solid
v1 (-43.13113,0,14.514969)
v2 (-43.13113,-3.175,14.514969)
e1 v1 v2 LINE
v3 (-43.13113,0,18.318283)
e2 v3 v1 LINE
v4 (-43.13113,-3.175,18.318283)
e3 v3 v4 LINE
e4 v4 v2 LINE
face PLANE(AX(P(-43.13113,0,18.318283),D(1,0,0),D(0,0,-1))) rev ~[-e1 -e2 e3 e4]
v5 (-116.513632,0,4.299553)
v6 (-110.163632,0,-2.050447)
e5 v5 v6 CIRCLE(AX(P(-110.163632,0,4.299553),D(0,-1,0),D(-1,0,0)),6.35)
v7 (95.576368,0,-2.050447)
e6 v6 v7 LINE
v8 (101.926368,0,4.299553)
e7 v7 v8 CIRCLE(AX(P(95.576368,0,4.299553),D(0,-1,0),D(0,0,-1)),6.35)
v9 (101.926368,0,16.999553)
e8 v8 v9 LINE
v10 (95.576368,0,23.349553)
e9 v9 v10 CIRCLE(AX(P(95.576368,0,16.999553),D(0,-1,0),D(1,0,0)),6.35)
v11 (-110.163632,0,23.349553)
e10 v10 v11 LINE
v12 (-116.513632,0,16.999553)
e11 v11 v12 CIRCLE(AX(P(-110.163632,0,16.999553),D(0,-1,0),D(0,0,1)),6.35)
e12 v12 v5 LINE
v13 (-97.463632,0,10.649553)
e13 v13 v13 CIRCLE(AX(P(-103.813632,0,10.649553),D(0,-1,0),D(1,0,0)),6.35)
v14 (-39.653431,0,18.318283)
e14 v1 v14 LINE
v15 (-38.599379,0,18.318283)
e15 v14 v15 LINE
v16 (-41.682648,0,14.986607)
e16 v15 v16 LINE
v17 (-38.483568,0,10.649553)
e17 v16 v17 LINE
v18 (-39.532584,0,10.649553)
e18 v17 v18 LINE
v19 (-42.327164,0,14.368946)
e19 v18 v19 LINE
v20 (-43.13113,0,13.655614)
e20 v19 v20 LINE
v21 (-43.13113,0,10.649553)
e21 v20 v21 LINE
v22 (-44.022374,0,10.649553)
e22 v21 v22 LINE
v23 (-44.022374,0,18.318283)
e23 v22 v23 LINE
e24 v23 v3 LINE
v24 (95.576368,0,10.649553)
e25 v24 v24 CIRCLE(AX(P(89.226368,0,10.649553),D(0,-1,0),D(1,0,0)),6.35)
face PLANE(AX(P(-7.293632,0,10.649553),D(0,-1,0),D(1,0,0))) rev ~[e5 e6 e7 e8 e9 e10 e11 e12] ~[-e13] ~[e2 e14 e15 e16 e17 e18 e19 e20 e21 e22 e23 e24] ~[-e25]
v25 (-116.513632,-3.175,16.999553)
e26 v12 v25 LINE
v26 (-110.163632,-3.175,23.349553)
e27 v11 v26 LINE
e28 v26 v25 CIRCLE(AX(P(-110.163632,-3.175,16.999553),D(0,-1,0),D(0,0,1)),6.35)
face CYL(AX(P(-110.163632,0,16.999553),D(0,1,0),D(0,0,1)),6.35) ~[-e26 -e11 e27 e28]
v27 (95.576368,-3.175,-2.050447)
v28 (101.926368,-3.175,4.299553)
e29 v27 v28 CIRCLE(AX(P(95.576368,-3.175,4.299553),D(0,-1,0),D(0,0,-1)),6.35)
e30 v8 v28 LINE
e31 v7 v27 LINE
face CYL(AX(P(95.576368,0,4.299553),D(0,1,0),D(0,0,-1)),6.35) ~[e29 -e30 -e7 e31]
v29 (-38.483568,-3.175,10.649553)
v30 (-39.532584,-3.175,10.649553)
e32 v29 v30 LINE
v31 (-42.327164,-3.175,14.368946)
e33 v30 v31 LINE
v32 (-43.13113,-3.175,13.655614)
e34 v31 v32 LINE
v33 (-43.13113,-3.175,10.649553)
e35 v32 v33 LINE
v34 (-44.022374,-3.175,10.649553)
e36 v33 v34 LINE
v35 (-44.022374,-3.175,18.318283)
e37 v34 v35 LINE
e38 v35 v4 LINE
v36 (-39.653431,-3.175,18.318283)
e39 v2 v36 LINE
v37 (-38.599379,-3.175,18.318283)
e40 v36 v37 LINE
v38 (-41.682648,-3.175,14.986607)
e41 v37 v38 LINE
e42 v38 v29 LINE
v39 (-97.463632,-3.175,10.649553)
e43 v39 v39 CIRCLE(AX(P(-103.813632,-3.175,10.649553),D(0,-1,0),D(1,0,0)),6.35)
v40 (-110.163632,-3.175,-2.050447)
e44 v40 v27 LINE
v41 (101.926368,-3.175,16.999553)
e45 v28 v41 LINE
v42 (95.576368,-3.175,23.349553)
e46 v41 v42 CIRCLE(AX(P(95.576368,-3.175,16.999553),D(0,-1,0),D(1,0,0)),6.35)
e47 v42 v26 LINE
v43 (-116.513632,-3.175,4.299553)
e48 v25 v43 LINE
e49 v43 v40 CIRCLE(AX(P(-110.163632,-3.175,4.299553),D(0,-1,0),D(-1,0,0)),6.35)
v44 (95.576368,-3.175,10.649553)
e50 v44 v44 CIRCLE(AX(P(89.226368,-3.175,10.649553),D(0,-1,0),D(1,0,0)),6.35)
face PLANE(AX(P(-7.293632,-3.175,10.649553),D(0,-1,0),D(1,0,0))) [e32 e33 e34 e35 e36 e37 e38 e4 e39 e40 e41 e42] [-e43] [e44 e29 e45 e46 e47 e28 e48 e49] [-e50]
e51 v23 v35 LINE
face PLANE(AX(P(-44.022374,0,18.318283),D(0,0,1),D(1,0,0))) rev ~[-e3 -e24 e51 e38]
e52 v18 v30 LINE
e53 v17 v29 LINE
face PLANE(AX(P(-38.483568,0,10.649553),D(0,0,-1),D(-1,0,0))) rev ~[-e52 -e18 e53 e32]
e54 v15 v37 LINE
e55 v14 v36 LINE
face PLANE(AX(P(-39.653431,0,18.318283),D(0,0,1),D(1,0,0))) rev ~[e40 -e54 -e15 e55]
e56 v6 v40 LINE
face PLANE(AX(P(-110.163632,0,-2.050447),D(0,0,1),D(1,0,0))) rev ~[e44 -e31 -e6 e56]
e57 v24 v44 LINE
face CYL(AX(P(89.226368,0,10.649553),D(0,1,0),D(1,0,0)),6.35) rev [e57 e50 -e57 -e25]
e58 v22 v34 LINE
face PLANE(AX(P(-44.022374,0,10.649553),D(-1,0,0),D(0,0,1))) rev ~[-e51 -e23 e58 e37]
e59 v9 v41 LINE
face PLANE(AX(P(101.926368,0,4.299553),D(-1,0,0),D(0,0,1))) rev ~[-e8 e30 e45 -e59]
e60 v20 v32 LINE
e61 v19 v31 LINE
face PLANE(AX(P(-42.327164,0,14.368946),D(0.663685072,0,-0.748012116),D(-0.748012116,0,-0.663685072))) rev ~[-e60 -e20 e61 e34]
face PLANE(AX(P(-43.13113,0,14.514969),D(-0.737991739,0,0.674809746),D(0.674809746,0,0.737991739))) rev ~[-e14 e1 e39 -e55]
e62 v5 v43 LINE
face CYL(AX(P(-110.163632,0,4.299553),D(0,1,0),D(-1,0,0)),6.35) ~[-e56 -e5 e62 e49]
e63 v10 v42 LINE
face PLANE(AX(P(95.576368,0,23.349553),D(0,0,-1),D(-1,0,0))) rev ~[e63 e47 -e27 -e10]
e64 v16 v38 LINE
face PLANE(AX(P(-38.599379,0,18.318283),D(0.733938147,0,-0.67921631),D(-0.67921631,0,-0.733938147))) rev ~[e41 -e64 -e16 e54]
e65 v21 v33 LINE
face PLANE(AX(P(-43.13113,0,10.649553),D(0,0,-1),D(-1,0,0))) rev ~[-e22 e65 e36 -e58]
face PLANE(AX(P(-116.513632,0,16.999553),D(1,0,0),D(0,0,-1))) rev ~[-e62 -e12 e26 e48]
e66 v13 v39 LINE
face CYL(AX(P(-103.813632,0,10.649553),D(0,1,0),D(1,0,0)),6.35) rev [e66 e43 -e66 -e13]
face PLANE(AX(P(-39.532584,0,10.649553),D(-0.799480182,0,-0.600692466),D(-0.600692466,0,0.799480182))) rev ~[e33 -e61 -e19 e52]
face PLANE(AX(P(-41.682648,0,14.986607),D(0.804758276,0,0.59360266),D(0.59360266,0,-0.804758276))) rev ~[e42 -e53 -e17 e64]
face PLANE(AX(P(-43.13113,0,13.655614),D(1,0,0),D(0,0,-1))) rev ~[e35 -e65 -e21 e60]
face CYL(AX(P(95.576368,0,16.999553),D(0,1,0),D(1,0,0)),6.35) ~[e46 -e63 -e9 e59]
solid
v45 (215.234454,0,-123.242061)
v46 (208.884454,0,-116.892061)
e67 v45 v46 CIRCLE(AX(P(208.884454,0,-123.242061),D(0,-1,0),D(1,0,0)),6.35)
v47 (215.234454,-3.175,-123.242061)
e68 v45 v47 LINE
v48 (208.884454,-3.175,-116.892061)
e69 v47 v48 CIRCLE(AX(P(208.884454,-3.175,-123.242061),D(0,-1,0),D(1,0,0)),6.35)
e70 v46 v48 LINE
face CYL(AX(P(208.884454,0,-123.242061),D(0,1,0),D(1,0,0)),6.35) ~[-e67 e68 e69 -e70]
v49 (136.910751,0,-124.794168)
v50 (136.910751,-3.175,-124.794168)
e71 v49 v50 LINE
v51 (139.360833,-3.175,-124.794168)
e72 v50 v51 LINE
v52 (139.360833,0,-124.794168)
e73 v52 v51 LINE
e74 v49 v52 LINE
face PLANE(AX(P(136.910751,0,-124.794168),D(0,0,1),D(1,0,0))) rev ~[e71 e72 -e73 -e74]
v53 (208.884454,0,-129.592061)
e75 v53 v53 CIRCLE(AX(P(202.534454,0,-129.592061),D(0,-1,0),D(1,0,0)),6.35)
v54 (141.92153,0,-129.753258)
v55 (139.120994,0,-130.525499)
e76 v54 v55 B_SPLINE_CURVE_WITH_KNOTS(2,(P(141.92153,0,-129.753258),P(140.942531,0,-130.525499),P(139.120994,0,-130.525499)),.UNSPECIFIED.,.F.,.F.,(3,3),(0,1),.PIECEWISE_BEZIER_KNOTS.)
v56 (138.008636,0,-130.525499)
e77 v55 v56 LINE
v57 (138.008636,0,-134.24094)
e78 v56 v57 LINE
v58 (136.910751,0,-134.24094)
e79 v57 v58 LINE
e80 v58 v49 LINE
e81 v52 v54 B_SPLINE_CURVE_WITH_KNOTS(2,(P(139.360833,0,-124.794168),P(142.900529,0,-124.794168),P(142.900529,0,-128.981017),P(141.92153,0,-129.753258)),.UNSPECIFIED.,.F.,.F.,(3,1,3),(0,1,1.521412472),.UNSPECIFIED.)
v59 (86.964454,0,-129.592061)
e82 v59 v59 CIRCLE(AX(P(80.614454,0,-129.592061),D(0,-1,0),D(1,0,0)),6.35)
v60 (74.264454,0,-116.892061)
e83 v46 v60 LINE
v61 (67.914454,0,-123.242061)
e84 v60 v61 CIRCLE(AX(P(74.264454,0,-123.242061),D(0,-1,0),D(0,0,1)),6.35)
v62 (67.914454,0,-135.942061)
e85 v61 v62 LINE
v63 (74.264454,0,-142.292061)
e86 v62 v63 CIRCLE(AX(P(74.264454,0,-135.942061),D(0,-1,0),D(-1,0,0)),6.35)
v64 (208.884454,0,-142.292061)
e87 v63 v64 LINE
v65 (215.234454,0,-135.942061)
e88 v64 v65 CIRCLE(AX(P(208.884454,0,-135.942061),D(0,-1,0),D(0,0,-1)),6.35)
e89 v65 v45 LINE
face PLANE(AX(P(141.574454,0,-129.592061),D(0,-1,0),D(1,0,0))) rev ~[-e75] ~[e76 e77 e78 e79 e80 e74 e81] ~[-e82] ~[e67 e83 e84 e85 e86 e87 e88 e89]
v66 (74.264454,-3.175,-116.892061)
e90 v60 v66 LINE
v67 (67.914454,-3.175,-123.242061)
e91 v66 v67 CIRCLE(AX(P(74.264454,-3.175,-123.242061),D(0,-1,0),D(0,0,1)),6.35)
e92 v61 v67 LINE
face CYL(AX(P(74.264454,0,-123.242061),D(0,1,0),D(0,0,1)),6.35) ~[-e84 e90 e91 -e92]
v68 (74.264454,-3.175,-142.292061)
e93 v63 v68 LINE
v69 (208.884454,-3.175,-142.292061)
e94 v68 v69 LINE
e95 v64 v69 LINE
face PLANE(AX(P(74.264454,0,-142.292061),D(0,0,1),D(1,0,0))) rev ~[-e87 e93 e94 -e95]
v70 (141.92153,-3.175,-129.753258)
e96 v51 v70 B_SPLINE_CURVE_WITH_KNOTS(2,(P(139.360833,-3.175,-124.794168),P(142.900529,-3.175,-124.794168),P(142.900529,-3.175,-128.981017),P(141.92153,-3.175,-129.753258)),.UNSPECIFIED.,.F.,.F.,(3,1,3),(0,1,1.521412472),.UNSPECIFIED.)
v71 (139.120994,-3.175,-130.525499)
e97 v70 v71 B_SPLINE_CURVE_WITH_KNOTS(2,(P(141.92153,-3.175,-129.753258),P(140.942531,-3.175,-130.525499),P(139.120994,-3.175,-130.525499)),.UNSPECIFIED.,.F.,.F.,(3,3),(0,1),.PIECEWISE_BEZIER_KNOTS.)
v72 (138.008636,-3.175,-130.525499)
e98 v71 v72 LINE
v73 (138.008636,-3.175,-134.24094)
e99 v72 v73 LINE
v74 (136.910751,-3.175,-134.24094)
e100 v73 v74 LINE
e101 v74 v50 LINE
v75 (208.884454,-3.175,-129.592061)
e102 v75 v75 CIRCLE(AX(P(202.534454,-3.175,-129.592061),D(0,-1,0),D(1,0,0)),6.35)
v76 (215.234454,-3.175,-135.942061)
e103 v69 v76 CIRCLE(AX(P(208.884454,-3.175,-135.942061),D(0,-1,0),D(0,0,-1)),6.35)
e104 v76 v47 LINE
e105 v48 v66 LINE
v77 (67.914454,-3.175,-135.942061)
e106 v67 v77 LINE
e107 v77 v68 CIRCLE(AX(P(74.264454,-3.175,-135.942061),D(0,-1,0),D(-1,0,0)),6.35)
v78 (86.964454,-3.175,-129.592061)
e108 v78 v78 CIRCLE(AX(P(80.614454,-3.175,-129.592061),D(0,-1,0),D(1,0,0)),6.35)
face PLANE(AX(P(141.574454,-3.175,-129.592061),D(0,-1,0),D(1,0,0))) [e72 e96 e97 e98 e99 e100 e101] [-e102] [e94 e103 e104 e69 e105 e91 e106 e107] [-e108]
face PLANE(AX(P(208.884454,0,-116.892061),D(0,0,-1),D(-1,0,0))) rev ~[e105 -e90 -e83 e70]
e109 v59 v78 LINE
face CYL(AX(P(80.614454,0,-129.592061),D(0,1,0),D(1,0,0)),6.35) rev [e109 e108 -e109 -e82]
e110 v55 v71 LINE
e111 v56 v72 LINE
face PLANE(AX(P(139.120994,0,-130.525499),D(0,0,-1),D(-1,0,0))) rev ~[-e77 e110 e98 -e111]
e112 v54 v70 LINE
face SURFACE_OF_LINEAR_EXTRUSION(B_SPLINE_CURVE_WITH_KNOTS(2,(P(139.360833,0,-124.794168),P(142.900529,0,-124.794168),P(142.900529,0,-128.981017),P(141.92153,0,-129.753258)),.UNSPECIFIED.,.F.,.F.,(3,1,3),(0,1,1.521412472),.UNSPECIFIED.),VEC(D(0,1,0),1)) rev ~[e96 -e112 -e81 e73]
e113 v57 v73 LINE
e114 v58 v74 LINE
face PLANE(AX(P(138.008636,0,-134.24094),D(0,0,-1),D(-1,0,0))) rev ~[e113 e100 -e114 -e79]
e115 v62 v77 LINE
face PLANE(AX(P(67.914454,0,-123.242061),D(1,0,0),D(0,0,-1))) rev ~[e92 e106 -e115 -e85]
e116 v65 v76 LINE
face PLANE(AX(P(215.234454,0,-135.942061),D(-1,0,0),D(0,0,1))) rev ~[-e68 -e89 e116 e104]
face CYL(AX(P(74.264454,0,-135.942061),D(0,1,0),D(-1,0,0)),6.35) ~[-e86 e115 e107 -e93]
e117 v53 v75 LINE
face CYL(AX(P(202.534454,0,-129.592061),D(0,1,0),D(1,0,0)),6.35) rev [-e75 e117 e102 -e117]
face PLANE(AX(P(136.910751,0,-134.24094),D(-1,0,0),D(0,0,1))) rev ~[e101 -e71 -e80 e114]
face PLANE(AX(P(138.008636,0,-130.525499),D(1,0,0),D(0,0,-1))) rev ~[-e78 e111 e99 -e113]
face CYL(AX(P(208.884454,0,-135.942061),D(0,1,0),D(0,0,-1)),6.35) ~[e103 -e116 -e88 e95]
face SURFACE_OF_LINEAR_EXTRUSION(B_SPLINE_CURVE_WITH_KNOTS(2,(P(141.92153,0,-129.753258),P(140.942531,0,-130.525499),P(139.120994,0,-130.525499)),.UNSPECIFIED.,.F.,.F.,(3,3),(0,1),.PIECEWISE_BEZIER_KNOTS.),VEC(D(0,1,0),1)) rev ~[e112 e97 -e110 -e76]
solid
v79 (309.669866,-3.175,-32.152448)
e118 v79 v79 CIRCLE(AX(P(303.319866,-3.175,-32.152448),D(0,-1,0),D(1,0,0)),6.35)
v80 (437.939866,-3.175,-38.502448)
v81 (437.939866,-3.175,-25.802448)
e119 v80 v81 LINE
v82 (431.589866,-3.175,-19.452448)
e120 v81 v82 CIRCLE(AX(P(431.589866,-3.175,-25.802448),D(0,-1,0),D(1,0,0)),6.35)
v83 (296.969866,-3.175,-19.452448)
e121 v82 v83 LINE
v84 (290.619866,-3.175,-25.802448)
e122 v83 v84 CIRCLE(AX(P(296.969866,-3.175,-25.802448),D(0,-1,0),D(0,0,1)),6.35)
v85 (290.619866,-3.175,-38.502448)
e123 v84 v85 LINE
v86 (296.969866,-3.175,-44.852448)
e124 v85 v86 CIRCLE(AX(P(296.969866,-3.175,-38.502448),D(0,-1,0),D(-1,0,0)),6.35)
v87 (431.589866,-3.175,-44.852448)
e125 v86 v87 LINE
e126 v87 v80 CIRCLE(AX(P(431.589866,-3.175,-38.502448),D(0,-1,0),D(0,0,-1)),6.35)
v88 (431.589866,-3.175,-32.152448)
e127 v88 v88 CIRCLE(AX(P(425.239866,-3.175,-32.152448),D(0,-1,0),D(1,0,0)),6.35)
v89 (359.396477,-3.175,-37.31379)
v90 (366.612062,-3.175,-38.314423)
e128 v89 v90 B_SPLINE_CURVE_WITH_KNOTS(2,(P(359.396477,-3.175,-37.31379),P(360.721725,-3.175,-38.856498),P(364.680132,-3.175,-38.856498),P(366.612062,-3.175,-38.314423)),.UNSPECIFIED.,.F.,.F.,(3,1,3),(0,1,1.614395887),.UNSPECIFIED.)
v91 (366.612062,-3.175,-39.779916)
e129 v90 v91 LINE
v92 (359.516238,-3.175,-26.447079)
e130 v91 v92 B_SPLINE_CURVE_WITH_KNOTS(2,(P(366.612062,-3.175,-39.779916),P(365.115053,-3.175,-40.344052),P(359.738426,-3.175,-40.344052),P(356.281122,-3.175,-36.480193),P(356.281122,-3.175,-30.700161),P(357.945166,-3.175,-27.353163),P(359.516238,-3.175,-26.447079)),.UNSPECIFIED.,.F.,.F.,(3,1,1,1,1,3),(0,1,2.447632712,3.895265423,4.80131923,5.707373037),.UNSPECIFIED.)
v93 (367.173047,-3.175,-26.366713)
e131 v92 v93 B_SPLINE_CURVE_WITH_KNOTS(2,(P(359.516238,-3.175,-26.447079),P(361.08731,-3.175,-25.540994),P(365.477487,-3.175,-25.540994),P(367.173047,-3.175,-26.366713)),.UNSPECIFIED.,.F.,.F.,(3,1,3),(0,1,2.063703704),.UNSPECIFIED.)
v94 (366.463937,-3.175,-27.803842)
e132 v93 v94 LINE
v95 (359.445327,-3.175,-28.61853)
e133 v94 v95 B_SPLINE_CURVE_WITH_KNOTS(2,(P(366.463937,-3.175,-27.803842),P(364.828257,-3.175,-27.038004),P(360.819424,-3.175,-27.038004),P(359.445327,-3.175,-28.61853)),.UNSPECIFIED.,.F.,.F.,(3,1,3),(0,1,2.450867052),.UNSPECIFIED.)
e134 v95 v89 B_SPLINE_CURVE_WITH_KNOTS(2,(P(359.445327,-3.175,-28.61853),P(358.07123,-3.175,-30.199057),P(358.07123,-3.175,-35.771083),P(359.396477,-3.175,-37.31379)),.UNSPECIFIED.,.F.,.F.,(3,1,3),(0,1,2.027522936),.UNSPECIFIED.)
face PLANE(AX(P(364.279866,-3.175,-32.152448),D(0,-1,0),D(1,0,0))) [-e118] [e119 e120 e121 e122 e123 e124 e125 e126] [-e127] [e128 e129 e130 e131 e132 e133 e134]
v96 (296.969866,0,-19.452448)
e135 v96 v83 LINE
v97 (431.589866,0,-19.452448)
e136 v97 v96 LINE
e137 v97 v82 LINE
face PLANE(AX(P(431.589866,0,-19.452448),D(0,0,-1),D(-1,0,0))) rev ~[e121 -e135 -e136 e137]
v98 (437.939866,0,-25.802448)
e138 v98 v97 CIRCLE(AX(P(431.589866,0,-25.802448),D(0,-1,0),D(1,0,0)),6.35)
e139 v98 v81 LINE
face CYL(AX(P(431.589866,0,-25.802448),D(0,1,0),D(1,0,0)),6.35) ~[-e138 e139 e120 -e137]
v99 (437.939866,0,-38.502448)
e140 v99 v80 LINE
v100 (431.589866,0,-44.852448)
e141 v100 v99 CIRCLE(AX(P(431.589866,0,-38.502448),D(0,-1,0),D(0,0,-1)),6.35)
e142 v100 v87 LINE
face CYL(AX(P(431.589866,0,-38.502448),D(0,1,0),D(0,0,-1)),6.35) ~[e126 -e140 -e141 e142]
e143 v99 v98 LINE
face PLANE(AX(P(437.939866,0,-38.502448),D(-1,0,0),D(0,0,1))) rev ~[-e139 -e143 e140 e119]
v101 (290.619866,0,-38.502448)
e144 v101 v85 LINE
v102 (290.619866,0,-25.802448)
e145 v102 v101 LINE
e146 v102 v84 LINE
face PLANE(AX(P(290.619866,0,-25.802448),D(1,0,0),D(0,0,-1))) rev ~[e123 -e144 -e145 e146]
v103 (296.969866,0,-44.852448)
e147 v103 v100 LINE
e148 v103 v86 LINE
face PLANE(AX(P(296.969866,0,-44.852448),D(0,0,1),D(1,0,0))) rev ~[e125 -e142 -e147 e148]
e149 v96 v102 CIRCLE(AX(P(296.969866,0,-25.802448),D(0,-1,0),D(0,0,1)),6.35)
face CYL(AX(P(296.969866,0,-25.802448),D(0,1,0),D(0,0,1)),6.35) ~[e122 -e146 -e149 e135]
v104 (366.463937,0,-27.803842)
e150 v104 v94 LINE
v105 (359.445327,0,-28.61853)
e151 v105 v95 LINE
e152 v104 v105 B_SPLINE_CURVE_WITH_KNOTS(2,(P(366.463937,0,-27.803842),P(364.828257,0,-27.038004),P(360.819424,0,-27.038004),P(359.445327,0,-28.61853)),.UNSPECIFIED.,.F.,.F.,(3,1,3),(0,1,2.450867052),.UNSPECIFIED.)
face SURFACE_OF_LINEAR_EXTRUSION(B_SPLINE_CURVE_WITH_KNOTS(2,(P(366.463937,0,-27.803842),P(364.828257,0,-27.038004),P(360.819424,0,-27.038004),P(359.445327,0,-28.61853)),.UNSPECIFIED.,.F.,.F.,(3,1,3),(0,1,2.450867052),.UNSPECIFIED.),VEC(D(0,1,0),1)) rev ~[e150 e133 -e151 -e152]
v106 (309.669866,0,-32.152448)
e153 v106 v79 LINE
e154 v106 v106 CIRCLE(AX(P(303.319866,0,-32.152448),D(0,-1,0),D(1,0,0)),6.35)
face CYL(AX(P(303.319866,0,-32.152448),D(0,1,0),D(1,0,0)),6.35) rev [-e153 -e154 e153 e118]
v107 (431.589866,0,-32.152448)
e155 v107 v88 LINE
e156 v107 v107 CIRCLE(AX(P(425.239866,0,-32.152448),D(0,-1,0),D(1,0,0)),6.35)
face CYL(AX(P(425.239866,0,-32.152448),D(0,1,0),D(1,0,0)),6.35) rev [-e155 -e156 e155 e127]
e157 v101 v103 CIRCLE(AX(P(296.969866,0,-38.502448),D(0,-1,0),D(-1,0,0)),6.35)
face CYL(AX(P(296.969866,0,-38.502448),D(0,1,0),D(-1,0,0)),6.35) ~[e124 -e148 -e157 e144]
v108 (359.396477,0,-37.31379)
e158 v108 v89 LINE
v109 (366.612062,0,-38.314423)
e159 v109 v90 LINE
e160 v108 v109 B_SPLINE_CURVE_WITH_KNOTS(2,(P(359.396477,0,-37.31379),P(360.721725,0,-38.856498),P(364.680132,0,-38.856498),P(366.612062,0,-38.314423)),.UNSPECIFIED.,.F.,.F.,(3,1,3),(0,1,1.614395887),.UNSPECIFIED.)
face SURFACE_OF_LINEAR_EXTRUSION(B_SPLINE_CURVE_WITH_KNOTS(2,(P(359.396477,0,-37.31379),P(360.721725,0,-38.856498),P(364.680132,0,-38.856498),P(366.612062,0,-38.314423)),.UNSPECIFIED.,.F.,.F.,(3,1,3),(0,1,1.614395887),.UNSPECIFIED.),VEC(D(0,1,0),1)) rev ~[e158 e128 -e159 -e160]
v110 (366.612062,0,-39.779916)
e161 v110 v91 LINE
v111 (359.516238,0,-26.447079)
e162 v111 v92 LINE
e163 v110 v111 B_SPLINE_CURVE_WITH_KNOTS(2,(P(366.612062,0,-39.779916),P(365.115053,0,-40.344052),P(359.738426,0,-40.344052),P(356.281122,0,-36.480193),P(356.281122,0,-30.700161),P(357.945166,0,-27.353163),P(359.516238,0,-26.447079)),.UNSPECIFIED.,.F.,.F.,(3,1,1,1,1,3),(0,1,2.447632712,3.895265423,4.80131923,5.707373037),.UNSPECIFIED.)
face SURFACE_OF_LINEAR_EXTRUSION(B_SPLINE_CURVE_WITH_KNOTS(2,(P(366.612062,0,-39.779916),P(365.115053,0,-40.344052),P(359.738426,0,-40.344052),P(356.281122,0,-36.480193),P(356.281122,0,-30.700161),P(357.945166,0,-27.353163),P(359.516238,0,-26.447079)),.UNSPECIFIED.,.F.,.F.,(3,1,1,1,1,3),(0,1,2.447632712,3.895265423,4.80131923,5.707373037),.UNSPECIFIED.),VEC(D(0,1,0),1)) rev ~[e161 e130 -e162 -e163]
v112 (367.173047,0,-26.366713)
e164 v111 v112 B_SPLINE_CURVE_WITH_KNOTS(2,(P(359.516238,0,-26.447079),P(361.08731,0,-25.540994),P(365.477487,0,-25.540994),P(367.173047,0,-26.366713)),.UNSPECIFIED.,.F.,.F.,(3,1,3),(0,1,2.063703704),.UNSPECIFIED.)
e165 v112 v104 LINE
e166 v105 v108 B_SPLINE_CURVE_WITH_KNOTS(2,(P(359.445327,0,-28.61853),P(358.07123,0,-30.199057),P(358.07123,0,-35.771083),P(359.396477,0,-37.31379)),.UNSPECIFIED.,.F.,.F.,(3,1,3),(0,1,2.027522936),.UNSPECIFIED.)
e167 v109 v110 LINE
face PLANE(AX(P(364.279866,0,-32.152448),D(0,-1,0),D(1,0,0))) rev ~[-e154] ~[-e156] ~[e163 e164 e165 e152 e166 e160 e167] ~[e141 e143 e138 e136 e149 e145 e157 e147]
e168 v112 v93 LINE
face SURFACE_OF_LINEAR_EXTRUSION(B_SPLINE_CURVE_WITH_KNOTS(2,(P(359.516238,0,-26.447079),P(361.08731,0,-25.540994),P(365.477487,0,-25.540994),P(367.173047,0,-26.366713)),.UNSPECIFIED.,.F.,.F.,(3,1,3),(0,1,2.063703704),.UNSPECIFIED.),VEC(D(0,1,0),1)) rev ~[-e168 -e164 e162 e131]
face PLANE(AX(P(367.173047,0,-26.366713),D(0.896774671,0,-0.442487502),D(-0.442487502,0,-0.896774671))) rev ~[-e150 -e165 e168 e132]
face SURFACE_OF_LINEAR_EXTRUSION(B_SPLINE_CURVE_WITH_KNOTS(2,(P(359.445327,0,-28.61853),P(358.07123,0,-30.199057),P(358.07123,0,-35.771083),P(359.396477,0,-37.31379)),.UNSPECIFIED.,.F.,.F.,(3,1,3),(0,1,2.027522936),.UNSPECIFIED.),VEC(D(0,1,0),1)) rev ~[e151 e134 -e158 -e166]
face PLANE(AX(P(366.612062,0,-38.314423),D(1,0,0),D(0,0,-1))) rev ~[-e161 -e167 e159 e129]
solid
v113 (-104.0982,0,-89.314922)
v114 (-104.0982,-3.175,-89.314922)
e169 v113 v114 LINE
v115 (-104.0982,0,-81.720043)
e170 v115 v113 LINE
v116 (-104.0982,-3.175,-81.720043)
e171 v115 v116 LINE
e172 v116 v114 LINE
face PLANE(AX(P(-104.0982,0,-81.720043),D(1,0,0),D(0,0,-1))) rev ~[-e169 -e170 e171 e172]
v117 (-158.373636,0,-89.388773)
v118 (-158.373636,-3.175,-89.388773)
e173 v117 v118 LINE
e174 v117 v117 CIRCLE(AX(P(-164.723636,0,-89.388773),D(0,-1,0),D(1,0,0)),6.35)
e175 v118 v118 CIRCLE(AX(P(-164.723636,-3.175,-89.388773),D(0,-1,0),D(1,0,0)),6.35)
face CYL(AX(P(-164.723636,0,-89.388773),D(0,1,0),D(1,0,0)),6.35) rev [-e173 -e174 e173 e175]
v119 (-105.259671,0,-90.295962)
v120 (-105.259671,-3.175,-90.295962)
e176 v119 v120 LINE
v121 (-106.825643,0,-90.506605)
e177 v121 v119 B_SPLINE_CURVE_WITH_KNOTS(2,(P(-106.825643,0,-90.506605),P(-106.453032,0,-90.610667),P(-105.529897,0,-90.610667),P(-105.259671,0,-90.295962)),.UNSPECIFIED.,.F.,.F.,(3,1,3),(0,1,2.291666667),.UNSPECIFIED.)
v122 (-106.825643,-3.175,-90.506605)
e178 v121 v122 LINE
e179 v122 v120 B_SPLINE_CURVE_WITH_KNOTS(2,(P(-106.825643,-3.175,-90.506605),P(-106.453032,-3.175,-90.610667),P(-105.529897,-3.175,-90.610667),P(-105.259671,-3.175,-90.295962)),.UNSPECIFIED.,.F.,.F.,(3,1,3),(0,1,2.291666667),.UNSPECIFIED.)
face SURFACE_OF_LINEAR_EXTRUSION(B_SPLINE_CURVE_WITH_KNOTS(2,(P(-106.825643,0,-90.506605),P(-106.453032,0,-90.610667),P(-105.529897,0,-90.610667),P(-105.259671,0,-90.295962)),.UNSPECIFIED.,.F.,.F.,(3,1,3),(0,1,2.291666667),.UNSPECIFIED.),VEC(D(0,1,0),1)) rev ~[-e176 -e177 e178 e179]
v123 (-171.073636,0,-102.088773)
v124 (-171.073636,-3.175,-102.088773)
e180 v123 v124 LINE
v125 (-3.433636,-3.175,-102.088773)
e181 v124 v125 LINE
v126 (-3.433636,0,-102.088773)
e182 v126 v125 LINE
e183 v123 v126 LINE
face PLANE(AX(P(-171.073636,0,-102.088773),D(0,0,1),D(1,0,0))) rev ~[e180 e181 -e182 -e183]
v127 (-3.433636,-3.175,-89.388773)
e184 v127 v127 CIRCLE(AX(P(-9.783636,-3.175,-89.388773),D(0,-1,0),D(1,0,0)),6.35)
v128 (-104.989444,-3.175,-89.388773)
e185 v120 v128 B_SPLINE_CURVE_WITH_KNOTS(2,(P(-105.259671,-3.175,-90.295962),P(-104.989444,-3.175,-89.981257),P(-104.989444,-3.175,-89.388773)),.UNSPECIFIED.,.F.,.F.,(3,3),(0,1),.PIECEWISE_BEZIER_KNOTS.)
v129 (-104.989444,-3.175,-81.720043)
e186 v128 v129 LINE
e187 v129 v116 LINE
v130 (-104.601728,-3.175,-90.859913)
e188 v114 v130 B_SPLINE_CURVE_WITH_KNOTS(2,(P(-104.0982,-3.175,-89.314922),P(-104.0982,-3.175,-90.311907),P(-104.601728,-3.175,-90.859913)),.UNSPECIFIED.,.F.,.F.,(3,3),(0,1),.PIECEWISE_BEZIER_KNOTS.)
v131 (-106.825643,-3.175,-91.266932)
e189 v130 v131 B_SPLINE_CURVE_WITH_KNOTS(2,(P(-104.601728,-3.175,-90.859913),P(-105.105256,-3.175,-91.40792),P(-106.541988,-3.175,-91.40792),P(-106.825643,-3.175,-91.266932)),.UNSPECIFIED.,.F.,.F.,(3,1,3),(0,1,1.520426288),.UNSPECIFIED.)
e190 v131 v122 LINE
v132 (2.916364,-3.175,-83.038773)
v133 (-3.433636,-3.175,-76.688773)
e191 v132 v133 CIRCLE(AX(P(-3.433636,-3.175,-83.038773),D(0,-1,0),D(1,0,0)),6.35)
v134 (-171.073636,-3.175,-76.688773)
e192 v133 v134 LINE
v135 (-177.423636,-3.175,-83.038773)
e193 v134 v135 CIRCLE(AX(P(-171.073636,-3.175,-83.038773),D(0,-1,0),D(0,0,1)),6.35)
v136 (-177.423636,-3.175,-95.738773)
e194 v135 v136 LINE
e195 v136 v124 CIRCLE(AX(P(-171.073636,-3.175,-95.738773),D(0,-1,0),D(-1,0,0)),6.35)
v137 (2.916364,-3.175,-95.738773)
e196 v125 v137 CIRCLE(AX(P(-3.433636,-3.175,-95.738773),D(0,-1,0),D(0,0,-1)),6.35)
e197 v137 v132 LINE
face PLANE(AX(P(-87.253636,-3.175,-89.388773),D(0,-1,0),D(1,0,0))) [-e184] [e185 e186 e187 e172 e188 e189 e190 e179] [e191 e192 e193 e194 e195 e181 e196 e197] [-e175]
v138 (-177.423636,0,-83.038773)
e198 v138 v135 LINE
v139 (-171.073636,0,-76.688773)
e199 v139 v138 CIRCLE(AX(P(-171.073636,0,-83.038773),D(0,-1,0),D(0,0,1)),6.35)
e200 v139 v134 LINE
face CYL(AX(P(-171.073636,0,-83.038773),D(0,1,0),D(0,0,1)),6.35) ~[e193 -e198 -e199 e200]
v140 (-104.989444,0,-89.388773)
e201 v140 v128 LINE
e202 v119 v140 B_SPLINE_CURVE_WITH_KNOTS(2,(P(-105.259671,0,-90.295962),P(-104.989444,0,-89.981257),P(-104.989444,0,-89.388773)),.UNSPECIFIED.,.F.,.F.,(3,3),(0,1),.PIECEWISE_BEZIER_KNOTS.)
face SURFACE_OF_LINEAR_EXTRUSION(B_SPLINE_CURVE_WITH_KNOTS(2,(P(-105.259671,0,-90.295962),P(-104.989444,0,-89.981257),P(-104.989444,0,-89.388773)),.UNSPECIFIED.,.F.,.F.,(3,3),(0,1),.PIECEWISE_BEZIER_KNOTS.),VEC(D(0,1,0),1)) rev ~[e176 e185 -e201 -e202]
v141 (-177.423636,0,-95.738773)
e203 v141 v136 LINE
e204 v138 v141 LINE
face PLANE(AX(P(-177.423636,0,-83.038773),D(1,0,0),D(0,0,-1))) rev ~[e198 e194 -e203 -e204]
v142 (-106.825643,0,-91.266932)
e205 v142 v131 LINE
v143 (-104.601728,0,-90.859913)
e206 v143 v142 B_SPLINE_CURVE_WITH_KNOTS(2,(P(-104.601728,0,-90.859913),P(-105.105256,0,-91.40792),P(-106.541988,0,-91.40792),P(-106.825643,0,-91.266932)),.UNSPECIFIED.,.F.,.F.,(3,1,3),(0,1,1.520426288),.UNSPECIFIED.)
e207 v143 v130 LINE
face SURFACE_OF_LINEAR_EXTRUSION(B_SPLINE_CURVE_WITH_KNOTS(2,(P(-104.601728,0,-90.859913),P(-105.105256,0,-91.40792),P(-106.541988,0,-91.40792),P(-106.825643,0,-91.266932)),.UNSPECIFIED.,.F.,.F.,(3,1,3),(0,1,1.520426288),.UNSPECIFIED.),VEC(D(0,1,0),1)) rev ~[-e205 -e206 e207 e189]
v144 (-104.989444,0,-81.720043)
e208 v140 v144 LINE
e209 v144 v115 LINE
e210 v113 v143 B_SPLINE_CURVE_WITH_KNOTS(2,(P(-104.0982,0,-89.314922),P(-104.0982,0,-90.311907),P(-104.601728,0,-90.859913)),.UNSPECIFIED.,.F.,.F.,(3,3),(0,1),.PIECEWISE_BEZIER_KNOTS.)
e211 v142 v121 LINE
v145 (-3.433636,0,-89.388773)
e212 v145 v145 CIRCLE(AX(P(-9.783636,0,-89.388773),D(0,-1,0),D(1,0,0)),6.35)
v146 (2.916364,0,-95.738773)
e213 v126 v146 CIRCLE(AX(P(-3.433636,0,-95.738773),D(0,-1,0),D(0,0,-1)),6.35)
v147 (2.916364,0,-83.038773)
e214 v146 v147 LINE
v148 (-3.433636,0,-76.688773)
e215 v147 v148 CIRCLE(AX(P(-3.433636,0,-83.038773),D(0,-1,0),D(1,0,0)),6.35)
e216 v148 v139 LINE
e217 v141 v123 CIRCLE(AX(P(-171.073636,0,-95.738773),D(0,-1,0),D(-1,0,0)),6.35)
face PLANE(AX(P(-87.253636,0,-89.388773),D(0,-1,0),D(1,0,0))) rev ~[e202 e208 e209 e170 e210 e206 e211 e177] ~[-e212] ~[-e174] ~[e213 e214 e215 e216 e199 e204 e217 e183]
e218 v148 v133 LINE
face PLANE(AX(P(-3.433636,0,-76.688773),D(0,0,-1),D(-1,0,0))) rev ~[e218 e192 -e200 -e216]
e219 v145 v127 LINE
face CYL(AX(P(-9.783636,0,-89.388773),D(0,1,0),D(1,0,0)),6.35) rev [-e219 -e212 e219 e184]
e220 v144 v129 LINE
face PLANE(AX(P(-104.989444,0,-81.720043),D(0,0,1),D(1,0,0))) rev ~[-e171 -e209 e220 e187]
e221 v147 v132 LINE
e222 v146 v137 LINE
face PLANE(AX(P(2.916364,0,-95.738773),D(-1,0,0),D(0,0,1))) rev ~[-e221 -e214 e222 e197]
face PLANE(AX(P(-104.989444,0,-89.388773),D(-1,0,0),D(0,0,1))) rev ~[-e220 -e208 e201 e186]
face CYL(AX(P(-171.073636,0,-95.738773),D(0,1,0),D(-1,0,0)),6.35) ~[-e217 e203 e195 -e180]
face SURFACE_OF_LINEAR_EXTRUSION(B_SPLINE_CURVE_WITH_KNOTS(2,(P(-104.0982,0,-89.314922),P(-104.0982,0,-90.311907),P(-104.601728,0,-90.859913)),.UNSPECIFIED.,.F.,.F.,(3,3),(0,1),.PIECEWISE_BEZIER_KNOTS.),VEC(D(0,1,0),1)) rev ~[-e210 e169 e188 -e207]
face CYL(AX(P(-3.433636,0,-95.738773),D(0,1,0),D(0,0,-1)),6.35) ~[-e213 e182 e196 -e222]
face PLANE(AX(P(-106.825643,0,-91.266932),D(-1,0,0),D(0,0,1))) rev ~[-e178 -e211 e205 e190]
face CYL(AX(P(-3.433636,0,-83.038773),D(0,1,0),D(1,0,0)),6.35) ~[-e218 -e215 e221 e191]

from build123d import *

# Parameters (mm, degrees)
F1_R     = 6.35
F2_DEPTH = 3.175
F3_R     = 6.35
F4_DEPTH = 3.175
F5_R     = 6.35
F6_DEPTH = 3.175
F7_R     = 6.35
F8_DEPTH = 3.175


# Not quite as in the source:
# - a length typed as a fraction of an inch, garbled in the dataset ("3 / 203.2 mm" for 3/8 in), is restored


with BuildPart() as f2:
    # F1 (on Front) → F2 (new body)
    with BuildSketch(Plane.XZ):
        with BuildLine():
            Line((95.5763677621, 23.3495529922), (-110.1636322379, 23.3495529922))
            ThreePointArc((-110.1636322379, 23.3495529922), (-114.6537602984, 21.4896810527), (-116.5136322379, 16.9995529922))
            Line((-116.5136322379, 16.9995529922), (-116.5136322379, 4.2995529922))
            ThreePointArc((-116.5136322379, 4.2995529922), (-114.6537602984, -0.1905750684), (-110.1636322379, -2.0504470078))
            Line((-110.1636322379, -2.0504470078), (95.5763677621, -2.0504470078))
            ThreePointArc((95.5763677621, -2.0504470078), (100.0664958226, -0.1905750684), (101.9263677621, 4.2995529922))
            Line((101.9263677621, 4.2995529922), (101.9263677621, 16.9995529922))
            ThreePointArc((101.9263677621, 16.9995529922), (100.0664958226, 21.4896810527), (95.5763677621, 23.3495529922))
        make_face()
        with Locations((-103.8136322379, 10.6495529922)):
            Circle(F1_R, mode=Mode.SUBTRACT)
        Polygon((-41.6826481417, 14.9866065492), (-38.4835676154, 10.6495529922), (-39.5325840524, 10.6495529922), (-42.3271638406, 14.3689456712), (-43.1311300379, 13.655614494), (-43.1311300379, 10.6495529922), (-44.0223744027, 10.6495529922), (-44.0223744027, 18.3182827531), (-43.1311300379, 18.3182827531), (-43.1311300379, 14.5149687592), (-39.653430746, 18.3182827531), (-38.5993790301, 18.3182827531), align=None, mode=Mode.SUBTRACT)
        with Locations((89.2263677621, 10.6495529922)):
            Circle(F1_R, mode=Mode.SUBTRACT)
    extrude(amount=F2_DEPTH)


with BuildPart() as f4:
    # F3 (on Front) → F4 (new body)
    with BuildSketch(Plane.XZ):
        with BuildLine():
            Line((-3.4336355138, -76.6887728453), (-171.0736355138, -76.6887728453))
            ThreePointArc((-171.0736355138, -76.6887728453), (-175.5637635743, -78.5486447847), (-177.4236355138, -83.0387728453))
            Line((-177.4236355138, -83.0387728453), (-177.4236355138, -95.7387728453))
            ThreePointArc((-177.4236355138, -95.7387728453), (-175.5637635743, -100.2289009058), (-171.0736355138, -102.0887728453))
            Line((-171.0736355138, -102.0887728453), (-3.4336355138, -102.0887728453))
            ThreePointArc((-3.4336355138, -102.0887728453), (1.0564925468, -100.2289009058), (2.9163644862, -95.7387728453))
            Line((2.9163644862, -95.7387728453), (2.9163644862, -83.0387728453))
            ThreePointArc((2.9163644862, -83.0387728453), (1.0564925468, -78.5486447847), (-3.4336355138, -76.6887728453))
        make_face()
        with Locations((-9.7836355138, -89.3887728453)):
            Circle(F3_R, mode=Mode.SUBTRACT)
        with Locations((-164.7236355138, -89.3887728453)):
            Circle(F3_R, mode=Mode.SUBTRACT)
        with BuildLine():
            add(Edge.make_bspline(
                [(-104.6017276977, -90.8599134965), (-105.1052555874, -91.4079196832), (-106.0502095939, -91.4079196832)],
                knots=[0, 0, 0, 1, 1, 1], degree=2))
            add(Edge.make_bspline(
                [(-106.0502095939, -91.4079196832), (-106.5419884995, -91.4079196832), (-106.8256425441, -91.266931874)],
                knots=[0, 0, 0, 1, 1, 1], degree=2))
            Line((-106.8256425441, -91.266931874), (-106.8256425441, -90.5066047605))
            add(Edge.make_bspline(
                [(-106.8256425441, -90.5066047605), (-106.4530319057, -90.6106671911), (-106.0502095939, -90.6106671911)],
                knots=[0, 0, 0, 1, 1, 1], degree=2))
            add(Edge.make_bspline(
                [(-106.0502095939, -90.6106671911), (-105.5298974411, -90.6106671911), (-105.2596708069, -90.29596226)],
                knots=[0, 0, 0, 1, 1, 1], degree=2))
            add(Edge.make_bspline(
                [(-105.2596708069, -90.29596226), (-104.9894441728, -89.9812573289), (-104.9894441728, -89.3887728453)],
                knots=[0, 0, 0, 1, 1, 1], degree=2))
            Line((-104.9894441728, -89.3887728453), (-104.9894441728, -81.7200430843))
            Line((-104.9894441728, -81.7200430843), (-104.0981998079, -81.7200430843))
            Line((-104.0981998079, -81.7200430843), (-104.0981998079, -89.3149220881))
            add(Edge.make_bspline(
                [(-104.0981998079, -89.3149220881), (-104.0981998079, -90.3119073098), (-104.6017276977, -90.8599134965)],
                knots=[0, 0, 0, 1, 1, 1], degree=2))
        make_face(mode=Mode.SUBTRACT)
    extrude(amount=F4_DEPTH)


with BuildPart() as f6:
    # F5 (on Front) → F6 (new body)
    with BuildSketch(Plane.XZ):
        with BuildLine():
            Line((208.8844542503, -116.8920610428), (74.2644542503, -116.8920610428))
            ThreePointArc((74.2644542503, -116.8920610428), (69.7743261898, -118.7519329823), (67.9144542503, -123.2420610428))
            Line((67.9144542503, -123.2420610428), (67.9144542503, -135.9420610428))
            ThreePointArc((67.9144542503, -135.9420610428), (69.7743261898, -140.4321891033), (74.2644542503, -142.2920610428))
            Line((74.2644542503, -142.2920610428), (208.8844542503, -142.2920610428))
            ThreePointArc((208.8844542503, -142.2920610428), (213.3745823109, -140.4321891033), (215.2344542503, -135.9420610428))
            Line((215.2344542503, -135.9420610428), (215.2344542503, -123.2420610428))
            ThreePointArc((215.2344542503, -123.2420610428), (213.3745823109, -118.7519329823), (208.8844542503, -116.8920610428))
        make_face()
        with Locations((202.5344542503, -129.5920610428)):
            Circle(F5_R, mode=Mode.SUBTRACT)
        with Locations((80.6144542503, -129.5920610428)):
            Circle(F5_R, mode=Mode.SUBTRACT)
        with BuildLine():
            add(Edge.make_bspline(
                [(139.3608329236, -124.7941682377), (142.9005294922, -124.7941682377), (142.9005294922, -127.5461169134)],
                knots=[0, 0, 0, 1, 1, 1], degree=2))
            add(Edge.make_bspline(
                [(142.9005294922, -127.5461169134), (142.9005294922, -128.9810172748), (141.9215304704, -129.7532583194)],
                knots=[0, 0, 0, 1, 1, 1], degree=2))
            add(Edge.make_bspline(
                [(141.9215304704, -129.7532583194), (140.9425314487, -130.525499364), (139.1209936701, -130.525499364)],
                knots=[0, 0, 0, 1, 1, 1], degree=2))
            Line((139.1209936701, -130.525499364), (138.0086357531, -130.525499364))
            Line((138.0086357531, -130.525499364), (138.0086357531, -134.2409402132))
            Line((138.0086357531, -134.2409402132), (136.9107508945, -134.2409402132))
            Line((136.9107508945, -134.2409402132), (136.9107508945, -124.7941682377))
            Line((136.9107508945, -124.7941682377), (139.3608329236, -124.7941682377))
        make_face(mode=Mode.SUBTRACT)
    extrude(amount=F6_DEPTH)


with BuildPart() as f8:
    # F7 (on Front) → F8 (new body)
    with BuildSketch(Plane.XZ):
        with BuildLine():
            Line((431.5898662186, -19.4524478495), (296.9698662186, -19.4524478495))
            ThreePointArc((296.9698662186, -19.4524478495), (292.479738158, -21.312319789), (290.6198662186, -25.8024478495))
            Line((290.6198662186, -25.8024478495), (290.6198662186, -38.5024478495))
            ThreePointArc((290.6198662186, -38.5024478495), (292.479738158, -42.99257591), (296.9698662186, -44.8524478495))
            Line((296.9698662186, -44.8524478495), (431.5898662186, -44.8524478495))
            ThreePointArc((431.5898662186, -44.8524478495), (436.0799942791, -42.99257591), (437.9398662186, -38.5024478495))
            Line((437.9398662186, -38.5024478495), (437.9398662186, -25.8024478495))
            ThreePointArc((437.9398662186, -25.8024478495), (436.0799942791, -21.312319789), (431.5898662186, -19.4524478495))
        make_face()
        with BuildLine():
            add(Edge.make_bspline(
                [(366.4639369183, -27.8038420737), (364.8282573372, -27.0380036572), (363.1925777562, -27.0380036572)],
                knots=[0, 0, 0, 1, 1, 1], degree=2))
            add(Edge.make_bspline(
                [(363.1925777562, -27.0380036572), (360.8194241444, -27.0380036572), (359.4453272324, -28.6185302658)],
                knots=[0, 0, 0, 1, 1, 1], degree=2))
            add(Edge.make_bspline(
                [(359.4453272324, -28.6185302658), (358.0712303204, -30.1990568745), (358.0712303204, -32.9472506985)],
                knots=[0, 0, 0, 1, 1, 1], degree=2))
            add(Edge.make_bspline(
                [(358.0712303204, -32.9472506985), (358.0712303204, -35.7710828846), (359.3964774569, -37.3137903122)],
                knots=[0, 0, 0, 1, 1, 1], degree=2))
            add(Edge.make_bspline(
                [(359.3964774569, -37.3137903122), (360.7217245933, -38.8564977398), (363.1736681657, -38.8564977398)],
                knots=[0, 0, 0, 1, 1, 1], degree=2))
            add(Edge.make_bspline(
                [(363.1736681657, -38.8564977398), (364.6801322114, -38.8564977398), (366.6120620441, -38.3144228112)],
                knots=[0, 0, 0, 1, 1, 1], degree=2))
            Line((366.6120620441, -38.3144228112), (366.6120620441, -39.7799160775))
            add(Edge.make_bspline(
                [(366.6120620441, -39.7799160775), (365.1150527937, -40.344052195), (362.9183886935, -40.344052195)],
                knots=[0, 0, 0, 1, 1, 1], degree=2))
            add(Edge.make_bspline(
                [(362.9183886935, -40.344052195), (359.7384258857, -40.344052195), (358.0097741512, -38.4121223623)],
                knots=[0, 0, 0, 1, 1, 1], degree=2))
            add(Edge.make_bspline(
                [(358.0097741512, -38.4121223623), (356.2811224167, -36.4801925296), (356.2811224167, -32.9251895095)],
                knots=[0, 0, 0, 1, 1, 1], degree=2))
            add(Edge.make_bspline(
                [(356.2811224167, -32.9251895095), (356.2811224167, -30.7001610236), (357.1131444001, -29.0266622615)],
                knots=[0, 0, 0, 1, 1, 1], degree=2))
            add(Edge.make_bspline(
                [(357.1131444001, -29.0266622615), (357.9451663835, -27.3531634994), (359.5162381969, -26.447078953)],
                knots=[0, 0, 0, 1, 1, 1], degree=2))
            add(Edge.make_bspline(
                [(359.5162381969, -26.447078953), (361.0873100103, -25.5409944067), (363.2146389452, -25.5409944067)],
                knots=[0, 0, 0, 1, 1, 1], degree=2))
            add(Edge.make_bspline(
                [(363.2146389452, -25.5409944067), (365.4774866122, -25.5409944067), (367.1730465632, -26.3667131933)],
                knots=[0, 0, 0, 1, 1, 1], degree=2))
            Line((367.1730465632, -26.3667131933), (366.4639369183, -27.8038420737))
        make_face(mode=Mode.SUBTRACT)
        with Locations((425.2398662186, -32.1524478495)):
            Circle(F7_R, mode=Mode.SUBTRACT)
        with Locations((303.3198662186, -32.1524478495)):
            Circle(F7_R, mode=Mode.SUBTRACT)
    extrude(amount=F8_DEPTH)


solid = Compound([f2.part, f4.part, f6.part, f8.part])
